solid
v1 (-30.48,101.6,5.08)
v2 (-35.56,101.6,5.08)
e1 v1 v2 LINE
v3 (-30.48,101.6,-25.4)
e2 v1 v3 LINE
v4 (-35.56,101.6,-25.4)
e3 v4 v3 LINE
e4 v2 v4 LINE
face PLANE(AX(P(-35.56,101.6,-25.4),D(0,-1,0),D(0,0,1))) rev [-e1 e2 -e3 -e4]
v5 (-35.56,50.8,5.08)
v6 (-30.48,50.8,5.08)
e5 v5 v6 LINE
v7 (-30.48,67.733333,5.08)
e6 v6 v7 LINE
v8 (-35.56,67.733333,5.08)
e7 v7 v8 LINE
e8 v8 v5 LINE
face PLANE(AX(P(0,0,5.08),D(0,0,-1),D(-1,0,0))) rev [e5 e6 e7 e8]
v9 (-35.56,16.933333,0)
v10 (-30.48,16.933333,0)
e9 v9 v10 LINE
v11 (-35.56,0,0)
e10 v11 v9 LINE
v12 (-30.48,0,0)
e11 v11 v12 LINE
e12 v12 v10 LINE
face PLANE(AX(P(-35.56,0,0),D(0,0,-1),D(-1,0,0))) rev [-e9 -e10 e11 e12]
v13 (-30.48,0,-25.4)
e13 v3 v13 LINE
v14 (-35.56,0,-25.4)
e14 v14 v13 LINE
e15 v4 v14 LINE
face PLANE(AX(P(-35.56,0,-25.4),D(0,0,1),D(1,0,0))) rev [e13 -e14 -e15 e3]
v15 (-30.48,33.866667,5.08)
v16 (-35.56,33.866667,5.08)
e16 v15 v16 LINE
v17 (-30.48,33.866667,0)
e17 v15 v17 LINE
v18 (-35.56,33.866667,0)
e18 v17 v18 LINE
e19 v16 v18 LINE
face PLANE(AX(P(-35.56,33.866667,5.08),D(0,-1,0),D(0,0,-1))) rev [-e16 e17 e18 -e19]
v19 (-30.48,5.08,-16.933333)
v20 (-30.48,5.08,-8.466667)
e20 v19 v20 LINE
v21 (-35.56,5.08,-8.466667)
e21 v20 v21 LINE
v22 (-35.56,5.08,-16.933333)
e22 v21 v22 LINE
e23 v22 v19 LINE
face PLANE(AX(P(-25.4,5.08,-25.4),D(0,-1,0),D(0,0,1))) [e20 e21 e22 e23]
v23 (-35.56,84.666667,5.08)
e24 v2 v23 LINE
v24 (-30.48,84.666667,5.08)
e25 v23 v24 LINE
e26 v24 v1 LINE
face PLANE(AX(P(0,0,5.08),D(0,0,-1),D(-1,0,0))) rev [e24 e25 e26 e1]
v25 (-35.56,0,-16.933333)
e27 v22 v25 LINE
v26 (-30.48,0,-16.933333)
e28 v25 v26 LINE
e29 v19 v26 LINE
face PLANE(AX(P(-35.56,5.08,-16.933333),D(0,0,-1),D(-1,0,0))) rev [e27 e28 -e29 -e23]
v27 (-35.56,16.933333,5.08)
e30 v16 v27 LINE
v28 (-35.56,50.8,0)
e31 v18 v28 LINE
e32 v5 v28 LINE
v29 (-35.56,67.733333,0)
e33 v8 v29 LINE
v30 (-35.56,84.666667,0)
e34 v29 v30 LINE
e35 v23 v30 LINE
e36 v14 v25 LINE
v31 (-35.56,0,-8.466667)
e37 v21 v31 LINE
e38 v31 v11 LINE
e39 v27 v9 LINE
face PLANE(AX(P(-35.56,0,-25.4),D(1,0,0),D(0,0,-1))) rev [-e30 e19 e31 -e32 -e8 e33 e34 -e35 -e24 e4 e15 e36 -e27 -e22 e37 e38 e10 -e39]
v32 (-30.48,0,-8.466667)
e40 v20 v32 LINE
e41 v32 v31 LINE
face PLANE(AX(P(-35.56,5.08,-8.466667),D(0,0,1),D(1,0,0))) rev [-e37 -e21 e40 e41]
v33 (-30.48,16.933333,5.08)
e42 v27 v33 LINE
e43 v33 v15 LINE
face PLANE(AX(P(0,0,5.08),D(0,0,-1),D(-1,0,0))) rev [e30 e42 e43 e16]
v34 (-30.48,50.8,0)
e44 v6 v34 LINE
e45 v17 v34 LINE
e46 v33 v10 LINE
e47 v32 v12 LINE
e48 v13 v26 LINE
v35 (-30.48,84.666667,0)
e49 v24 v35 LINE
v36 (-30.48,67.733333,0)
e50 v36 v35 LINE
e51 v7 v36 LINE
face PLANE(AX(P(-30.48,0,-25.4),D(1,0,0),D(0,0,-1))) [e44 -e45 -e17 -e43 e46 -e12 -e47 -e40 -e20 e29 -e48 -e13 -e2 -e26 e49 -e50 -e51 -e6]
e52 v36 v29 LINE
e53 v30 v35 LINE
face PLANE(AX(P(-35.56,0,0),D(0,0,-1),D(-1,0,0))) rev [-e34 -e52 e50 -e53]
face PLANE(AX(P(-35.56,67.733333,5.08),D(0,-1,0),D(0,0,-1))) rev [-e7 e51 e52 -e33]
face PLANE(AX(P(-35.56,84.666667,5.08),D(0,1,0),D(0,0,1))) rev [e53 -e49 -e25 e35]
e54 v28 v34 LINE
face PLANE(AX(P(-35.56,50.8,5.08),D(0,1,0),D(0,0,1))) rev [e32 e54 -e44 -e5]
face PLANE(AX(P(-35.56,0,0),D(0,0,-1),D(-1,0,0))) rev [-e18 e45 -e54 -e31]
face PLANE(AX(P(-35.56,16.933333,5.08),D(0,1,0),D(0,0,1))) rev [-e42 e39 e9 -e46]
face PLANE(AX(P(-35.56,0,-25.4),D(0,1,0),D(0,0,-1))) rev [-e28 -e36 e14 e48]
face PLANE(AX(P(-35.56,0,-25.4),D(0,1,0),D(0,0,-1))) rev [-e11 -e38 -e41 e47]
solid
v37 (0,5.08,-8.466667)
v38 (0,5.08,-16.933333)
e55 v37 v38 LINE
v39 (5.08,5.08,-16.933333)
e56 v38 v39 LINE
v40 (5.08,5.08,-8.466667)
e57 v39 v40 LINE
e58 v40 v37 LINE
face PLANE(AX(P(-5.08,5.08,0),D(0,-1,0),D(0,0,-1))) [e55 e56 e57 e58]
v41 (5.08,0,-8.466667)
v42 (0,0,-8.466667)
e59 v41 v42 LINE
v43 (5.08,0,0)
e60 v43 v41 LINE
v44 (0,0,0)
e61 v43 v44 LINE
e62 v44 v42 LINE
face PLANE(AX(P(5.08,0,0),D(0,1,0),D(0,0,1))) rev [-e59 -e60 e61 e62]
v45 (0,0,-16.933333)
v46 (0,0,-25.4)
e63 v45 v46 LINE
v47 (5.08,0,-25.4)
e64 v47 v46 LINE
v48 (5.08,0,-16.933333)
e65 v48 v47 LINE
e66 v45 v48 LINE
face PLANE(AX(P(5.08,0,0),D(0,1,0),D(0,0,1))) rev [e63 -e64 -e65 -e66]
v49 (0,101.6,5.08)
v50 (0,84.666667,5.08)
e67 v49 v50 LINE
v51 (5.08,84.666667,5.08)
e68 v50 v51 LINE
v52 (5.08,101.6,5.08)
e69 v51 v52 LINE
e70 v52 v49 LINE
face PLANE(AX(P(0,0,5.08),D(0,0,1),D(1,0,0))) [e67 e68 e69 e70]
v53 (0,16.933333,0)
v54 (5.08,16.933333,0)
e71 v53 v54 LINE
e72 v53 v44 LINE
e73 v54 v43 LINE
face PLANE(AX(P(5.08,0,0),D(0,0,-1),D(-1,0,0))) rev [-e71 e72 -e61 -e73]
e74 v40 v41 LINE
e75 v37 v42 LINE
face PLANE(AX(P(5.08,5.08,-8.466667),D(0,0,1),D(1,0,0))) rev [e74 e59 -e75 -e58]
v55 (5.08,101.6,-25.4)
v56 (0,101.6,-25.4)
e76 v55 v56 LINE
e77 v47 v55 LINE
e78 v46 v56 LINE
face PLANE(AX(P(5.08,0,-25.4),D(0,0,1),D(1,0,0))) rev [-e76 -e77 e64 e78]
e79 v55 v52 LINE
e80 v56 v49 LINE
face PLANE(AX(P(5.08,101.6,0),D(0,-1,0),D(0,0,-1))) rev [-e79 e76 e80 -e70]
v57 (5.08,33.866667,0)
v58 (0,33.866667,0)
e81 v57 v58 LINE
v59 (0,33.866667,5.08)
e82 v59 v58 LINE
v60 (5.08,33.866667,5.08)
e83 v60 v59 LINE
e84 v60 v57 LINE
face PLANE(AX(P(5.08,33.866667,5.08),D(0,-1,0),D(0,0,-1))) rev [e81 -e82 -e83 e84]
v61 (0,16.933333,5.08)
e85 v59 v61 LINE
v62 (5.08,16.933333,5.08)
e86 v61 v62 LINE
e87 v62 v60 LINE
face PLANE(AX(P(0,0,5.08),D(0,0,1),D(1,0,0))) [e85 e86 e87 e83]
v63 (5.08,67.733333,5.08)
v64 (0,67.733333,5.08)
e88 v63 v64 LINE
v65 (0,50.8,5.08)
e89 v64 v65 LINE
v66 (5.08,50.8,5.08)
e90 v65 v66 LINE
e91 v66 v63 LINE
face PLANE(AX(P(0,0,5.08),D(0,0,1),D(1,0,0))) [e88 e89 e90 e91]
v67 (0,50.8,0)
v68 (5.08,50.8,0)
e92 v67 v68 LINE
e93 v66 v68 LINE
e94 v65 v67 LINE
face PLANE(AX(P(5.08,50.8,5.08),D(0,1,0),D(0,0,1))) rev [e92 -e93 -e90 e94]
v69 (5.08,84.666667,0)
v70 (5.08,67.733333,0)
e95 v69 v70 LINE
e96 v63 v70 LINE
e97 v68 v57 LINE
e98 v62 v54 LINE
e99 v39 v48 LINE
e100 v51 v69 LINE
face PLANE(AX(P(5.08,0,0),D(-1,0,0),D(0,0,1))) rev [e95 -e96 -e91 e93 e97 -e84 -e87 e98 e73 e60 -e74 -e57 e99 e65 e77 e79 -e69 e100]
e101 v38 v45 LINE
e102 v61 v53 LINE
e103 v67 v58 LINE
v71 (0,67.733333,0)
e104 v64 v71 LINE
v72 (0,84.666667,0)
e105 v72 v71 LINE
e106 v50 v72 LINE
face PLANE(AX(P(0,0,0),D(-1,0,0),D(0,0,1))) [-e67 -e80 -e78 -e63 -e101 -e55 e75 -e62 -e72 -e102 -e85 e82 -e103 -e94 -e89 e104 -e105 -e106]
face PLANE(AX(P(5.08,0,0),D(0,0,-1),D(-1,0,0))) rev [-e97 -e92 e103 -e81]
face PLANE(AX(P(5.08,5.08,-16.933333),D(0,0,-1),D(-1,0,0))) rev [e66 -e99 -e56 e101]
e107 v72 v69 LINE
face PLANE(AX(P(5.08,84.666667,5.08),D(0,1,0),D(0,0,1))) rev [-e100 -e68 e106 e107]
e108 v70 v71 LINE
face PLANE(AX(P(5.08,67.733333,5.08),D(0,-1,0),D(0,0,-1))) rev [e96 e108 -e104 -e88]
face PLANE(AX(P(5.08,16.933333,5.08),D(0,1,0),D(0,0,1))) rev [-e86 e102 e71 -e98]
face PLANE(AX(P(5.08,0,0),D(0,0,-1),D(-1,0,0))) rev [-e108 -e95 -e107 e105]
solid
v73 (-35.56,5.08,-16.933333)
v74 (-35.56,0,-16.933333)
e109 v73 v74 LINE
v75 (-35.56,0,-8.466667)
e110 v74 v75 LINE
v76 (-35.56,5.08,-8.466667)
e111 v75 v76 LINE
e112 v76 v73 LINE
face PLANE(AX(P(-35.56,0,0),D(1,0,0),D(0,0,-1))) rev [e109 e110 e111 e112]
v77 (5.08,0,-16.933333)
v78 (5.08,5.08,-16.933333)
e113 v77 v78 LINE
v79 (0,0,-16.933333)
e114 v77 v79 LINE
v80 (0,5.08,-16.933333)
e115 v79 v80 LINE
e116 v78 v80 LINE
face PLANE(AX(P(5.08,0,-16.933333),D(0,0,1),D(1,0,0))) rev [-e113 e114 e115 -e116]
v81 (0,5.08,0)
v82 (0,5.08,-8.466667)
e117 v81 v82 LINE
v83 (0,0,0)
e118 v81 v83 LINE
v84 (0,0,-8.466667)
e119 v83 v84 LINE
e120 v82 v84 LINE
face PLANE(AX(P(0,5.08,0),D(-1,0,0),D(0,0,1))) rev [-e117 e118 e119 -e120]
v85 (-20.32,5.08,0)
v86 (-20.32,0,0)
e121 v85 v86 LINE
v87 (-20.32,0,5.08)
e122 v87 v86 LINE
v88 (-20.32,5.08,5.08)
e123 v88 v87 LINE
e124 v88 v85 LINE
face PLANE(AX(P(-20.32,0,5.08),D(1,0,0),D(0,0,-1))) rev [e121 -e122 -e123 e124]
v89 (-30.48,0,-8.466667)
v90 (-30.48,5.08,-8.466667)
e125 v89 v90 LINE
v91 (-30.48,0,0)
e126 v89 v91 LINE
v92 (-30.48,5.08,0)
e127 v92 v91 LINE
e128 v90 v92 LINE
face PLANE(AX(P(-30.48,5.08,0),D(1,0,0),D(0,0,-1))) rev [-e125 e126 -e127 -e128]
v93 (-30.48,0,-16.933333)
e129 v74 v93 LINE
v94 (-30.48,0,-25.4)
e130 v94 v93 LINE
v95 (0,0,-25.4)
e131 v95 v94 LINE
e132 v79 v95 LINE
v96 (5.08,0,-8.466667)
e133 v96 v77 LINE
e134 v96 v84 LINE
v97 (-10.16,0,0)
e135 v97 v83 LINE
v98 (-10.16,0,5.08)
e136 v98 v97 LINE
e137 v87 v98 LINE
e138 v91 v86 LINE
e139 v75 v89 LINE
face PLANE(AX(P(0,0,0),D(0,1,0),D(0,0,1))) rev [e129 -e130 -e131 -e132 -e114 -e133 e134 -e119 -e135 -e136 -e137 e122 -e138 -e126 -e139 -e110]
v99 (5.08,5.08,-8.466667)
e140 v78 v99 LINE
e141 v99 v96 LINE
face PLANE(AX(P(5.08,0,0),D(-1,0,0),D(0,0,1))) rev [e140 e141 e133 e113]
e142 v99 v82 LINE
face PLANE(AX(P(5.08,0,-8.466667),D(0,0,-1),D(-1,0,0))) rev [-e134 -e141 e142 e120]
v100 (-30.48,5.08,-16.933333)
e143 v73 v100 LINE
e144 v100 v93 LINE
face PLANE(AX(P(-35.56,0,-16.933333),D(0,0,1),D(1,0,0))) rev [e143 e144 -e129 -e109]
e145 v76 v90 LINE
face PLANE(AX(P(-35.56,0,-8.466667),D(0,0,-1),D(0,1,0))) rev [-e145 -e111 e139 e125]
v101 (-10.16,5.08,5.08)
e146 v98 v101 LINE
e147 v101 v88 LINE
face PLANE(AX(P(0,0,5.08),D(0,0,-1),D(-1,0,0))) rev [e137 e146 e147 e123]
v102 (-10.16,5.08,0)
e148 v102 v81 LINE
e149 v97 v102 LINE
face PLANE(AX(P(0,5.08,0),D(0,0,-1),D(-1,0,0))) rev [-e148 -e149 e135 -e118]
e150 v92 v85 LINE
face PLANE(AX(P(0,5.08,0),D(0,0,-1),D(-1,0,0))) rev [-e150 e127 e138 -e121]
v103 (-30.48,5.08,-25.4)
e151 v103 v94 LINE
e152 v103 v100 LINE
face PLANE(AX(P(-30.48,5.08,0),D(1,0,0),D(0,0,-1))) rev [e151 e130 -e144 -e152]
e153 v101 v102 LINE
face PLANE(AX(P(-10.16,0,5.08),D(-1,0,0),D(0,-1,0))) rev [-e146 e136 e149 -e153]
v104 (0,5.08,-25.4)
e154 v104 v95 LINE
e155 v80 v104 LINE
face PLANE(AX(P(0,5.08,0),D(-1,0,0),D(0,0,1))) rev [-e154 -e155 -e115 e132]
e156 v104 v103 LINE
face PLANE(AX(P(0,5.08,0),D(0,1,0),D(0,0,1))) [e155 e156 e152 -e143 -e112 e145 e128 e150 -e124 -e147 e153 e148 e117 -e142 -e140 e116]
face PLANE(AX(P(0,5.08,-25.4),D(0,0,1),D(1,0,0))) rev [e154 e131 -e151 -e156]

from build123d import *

# Parameters (mm, degrees)
SKETCH1_W           = 30.48
SKETCH1_H           = 25.4
BOSS_EXTRUDE1_DEPTH = 5.08
SKETCH2_W           = 8.466666666
SKETCH2_H           = 5.08
BOSS_EXTRUDE2_DEPTH = 5.08
SKETCH3_W           = 8.466666666
SKETCH3_H           = 5.08
BOSS_EXTRUDE3_DEPTH = 5.08
SKETCH4_W           = 25.4
SKETCH4_H           = 101.6
BOSS_EXTRUDE4_DEPTH = 5.08
SKETCH5_W           = 5.08
SKETCH5_H           = 8.466666666
CUT_EXTRUDE1_DEPTH  = 5.08
CIRPATTERN1_COUNT   = 2
SKETCH6_W           = 10.16
SKETCH6_H           = 5.08
BOSS_EXTRUDE5_DEPTH = 5.08
SKETCH7_W           = 5.08
SKETCH7_H           = 16.933333334
SKETCH7_H_2         = 16.933333333
BOSS_EXTRUDE6_DEPTH = 5.08
SKETCH8_W           = 5.08
SKETCH8_H           = 16.933333334
SKETCH8_H_2         = 16.933333333
BOSS_EXTRUDE7_DEPTH = 5.08


with BuildPart() as part:
    # Sketch1 → Boss-Extrude1 (new body)
    with BuildSketch(Plane(origin=(0, 0, 0), x_dir=(1, 0, 0), z_dir=(0, 1, 0))):
        with Locations((-15.24, 12.7)):
            Rectangle(SKETCH1_W, SKETCH1_H)
    extrude(amount=BOSS_EXTRUDE1_DEPTH)

    # Sketch2 → Boss-Extrude2 (add)
    with BuildSketch(Plane(origin=(0, 0, 0), x_dir=(0, 0, -1), z_dir=(1, 0, 0))):
        with Locations((12.7, 2.54)):
            Rectangle(SKETCH2_W, SKETCH2_H)
    extrude(amount=BOSS_EXTRUDE2_DEPTH)

    # Sketch3 → Boss-Extrude3 (add)
    with BuildSketch(Plane.ZY.offset(30.48)):
        with Locations((-12.7, 2.54)):
            Rectangle(SKETCH3_W, SKETCH3_H)
    extrude(amount=BOSS_EXTRUDE3_DEPTH)

    # Sketch6 → Boss-Extrude5 (add)
    with BuildSketch(Plane.XY):
        with Locations((-15.24, 2.54)):
            Rectangle(SKETCH6_W, SKETCH6_H)
    extrude(amount=BOSS_EXTRUDE5_DEPTH)


with BuildPart() as body_2:
    # Sketch4 → Boss-Extrude4 (new body)
    with BuildSketch(Plane(origin=(5.08, 0, 0), x_dir=(0, 0, -1), z_dir=(1, 0, 0))):
        with Locations((12.7, 50.8)):
            Rectangle(SKETCH4_W, SKETCH4_H)
    extrude(amount=BOSS_EXTRUDE4_DEPTH)

    # Sketch5 → Cut-Extrude1 (cut)
    with BuildSketch(Plane(origin=(0, 0, 0), x_dir=(-1, 0, 0), z_dir=(0, -1, 0))):
        with Locations((-7.62, 12.7)):
            Rectangle(SKETCH5_W, SKETCH5_H)
    extrude(amount=-CUT_EXTRUDE1_DEPTH, mode=Mode.SUBTRACT)


with BuildPart() as body_2_1:
    # Body-Move/Copy1: read off the stored shape, not the designer's step
    # Body-Move/Copy1: moved
    add(body_2.part.moved(Location((-5.08, 0, 0))))


with BuildPart() as cirpattern1_1:
    # CirPattern1: pattern copy
    add(body_2_1.part.rotate(Axis((-15.24, 0, -12.7), (0, 1, 0)), 1 * 360 / CIRPATTERN1_COUNT))

    # Sketch7 → Boss-Extrude6 (add)
    with BuildSketch(Plane.XY):
        with Locations((-33.02, 25.4)):
            Rectangle(SKETCH7_W, SKETCH7_H)
        with Locations((-33.02, 59.266666667)):
            Rectangle(SKETCH7_W, SKETCH7_H_2)
        with Locations((-33.02, 93.133333334)):
            Rectangle(SKETCH7_W, SKETCH7_H_2)
    extrude(amount=BOSS_EXTRUDE6_DEPTH)


with BuildPart() as body_2_2:
    add(body_2_1.part)

    # Sketch8 → Boss-Extrude7 (add)
    with BuildSketch(Plane.XY):
        with Locations((2.54, 25.4)):
            Rectangle(SKETCH8_W, SKETCH8_H)
        with Locations((2.54, 59.266666667)):
            Rectangle(SKETCH8_W, SKETCH8_H_2)
        with Locations((2.54, 93.133333334)):
            Rectangle(SKETCH8_W, SKETCH8_H_2)
    extrude(amount=BOSS_EXTRUDE7_DEPTH)


solid = Compound([part.part, cirpattern1_1.part, body_2_2.part])
